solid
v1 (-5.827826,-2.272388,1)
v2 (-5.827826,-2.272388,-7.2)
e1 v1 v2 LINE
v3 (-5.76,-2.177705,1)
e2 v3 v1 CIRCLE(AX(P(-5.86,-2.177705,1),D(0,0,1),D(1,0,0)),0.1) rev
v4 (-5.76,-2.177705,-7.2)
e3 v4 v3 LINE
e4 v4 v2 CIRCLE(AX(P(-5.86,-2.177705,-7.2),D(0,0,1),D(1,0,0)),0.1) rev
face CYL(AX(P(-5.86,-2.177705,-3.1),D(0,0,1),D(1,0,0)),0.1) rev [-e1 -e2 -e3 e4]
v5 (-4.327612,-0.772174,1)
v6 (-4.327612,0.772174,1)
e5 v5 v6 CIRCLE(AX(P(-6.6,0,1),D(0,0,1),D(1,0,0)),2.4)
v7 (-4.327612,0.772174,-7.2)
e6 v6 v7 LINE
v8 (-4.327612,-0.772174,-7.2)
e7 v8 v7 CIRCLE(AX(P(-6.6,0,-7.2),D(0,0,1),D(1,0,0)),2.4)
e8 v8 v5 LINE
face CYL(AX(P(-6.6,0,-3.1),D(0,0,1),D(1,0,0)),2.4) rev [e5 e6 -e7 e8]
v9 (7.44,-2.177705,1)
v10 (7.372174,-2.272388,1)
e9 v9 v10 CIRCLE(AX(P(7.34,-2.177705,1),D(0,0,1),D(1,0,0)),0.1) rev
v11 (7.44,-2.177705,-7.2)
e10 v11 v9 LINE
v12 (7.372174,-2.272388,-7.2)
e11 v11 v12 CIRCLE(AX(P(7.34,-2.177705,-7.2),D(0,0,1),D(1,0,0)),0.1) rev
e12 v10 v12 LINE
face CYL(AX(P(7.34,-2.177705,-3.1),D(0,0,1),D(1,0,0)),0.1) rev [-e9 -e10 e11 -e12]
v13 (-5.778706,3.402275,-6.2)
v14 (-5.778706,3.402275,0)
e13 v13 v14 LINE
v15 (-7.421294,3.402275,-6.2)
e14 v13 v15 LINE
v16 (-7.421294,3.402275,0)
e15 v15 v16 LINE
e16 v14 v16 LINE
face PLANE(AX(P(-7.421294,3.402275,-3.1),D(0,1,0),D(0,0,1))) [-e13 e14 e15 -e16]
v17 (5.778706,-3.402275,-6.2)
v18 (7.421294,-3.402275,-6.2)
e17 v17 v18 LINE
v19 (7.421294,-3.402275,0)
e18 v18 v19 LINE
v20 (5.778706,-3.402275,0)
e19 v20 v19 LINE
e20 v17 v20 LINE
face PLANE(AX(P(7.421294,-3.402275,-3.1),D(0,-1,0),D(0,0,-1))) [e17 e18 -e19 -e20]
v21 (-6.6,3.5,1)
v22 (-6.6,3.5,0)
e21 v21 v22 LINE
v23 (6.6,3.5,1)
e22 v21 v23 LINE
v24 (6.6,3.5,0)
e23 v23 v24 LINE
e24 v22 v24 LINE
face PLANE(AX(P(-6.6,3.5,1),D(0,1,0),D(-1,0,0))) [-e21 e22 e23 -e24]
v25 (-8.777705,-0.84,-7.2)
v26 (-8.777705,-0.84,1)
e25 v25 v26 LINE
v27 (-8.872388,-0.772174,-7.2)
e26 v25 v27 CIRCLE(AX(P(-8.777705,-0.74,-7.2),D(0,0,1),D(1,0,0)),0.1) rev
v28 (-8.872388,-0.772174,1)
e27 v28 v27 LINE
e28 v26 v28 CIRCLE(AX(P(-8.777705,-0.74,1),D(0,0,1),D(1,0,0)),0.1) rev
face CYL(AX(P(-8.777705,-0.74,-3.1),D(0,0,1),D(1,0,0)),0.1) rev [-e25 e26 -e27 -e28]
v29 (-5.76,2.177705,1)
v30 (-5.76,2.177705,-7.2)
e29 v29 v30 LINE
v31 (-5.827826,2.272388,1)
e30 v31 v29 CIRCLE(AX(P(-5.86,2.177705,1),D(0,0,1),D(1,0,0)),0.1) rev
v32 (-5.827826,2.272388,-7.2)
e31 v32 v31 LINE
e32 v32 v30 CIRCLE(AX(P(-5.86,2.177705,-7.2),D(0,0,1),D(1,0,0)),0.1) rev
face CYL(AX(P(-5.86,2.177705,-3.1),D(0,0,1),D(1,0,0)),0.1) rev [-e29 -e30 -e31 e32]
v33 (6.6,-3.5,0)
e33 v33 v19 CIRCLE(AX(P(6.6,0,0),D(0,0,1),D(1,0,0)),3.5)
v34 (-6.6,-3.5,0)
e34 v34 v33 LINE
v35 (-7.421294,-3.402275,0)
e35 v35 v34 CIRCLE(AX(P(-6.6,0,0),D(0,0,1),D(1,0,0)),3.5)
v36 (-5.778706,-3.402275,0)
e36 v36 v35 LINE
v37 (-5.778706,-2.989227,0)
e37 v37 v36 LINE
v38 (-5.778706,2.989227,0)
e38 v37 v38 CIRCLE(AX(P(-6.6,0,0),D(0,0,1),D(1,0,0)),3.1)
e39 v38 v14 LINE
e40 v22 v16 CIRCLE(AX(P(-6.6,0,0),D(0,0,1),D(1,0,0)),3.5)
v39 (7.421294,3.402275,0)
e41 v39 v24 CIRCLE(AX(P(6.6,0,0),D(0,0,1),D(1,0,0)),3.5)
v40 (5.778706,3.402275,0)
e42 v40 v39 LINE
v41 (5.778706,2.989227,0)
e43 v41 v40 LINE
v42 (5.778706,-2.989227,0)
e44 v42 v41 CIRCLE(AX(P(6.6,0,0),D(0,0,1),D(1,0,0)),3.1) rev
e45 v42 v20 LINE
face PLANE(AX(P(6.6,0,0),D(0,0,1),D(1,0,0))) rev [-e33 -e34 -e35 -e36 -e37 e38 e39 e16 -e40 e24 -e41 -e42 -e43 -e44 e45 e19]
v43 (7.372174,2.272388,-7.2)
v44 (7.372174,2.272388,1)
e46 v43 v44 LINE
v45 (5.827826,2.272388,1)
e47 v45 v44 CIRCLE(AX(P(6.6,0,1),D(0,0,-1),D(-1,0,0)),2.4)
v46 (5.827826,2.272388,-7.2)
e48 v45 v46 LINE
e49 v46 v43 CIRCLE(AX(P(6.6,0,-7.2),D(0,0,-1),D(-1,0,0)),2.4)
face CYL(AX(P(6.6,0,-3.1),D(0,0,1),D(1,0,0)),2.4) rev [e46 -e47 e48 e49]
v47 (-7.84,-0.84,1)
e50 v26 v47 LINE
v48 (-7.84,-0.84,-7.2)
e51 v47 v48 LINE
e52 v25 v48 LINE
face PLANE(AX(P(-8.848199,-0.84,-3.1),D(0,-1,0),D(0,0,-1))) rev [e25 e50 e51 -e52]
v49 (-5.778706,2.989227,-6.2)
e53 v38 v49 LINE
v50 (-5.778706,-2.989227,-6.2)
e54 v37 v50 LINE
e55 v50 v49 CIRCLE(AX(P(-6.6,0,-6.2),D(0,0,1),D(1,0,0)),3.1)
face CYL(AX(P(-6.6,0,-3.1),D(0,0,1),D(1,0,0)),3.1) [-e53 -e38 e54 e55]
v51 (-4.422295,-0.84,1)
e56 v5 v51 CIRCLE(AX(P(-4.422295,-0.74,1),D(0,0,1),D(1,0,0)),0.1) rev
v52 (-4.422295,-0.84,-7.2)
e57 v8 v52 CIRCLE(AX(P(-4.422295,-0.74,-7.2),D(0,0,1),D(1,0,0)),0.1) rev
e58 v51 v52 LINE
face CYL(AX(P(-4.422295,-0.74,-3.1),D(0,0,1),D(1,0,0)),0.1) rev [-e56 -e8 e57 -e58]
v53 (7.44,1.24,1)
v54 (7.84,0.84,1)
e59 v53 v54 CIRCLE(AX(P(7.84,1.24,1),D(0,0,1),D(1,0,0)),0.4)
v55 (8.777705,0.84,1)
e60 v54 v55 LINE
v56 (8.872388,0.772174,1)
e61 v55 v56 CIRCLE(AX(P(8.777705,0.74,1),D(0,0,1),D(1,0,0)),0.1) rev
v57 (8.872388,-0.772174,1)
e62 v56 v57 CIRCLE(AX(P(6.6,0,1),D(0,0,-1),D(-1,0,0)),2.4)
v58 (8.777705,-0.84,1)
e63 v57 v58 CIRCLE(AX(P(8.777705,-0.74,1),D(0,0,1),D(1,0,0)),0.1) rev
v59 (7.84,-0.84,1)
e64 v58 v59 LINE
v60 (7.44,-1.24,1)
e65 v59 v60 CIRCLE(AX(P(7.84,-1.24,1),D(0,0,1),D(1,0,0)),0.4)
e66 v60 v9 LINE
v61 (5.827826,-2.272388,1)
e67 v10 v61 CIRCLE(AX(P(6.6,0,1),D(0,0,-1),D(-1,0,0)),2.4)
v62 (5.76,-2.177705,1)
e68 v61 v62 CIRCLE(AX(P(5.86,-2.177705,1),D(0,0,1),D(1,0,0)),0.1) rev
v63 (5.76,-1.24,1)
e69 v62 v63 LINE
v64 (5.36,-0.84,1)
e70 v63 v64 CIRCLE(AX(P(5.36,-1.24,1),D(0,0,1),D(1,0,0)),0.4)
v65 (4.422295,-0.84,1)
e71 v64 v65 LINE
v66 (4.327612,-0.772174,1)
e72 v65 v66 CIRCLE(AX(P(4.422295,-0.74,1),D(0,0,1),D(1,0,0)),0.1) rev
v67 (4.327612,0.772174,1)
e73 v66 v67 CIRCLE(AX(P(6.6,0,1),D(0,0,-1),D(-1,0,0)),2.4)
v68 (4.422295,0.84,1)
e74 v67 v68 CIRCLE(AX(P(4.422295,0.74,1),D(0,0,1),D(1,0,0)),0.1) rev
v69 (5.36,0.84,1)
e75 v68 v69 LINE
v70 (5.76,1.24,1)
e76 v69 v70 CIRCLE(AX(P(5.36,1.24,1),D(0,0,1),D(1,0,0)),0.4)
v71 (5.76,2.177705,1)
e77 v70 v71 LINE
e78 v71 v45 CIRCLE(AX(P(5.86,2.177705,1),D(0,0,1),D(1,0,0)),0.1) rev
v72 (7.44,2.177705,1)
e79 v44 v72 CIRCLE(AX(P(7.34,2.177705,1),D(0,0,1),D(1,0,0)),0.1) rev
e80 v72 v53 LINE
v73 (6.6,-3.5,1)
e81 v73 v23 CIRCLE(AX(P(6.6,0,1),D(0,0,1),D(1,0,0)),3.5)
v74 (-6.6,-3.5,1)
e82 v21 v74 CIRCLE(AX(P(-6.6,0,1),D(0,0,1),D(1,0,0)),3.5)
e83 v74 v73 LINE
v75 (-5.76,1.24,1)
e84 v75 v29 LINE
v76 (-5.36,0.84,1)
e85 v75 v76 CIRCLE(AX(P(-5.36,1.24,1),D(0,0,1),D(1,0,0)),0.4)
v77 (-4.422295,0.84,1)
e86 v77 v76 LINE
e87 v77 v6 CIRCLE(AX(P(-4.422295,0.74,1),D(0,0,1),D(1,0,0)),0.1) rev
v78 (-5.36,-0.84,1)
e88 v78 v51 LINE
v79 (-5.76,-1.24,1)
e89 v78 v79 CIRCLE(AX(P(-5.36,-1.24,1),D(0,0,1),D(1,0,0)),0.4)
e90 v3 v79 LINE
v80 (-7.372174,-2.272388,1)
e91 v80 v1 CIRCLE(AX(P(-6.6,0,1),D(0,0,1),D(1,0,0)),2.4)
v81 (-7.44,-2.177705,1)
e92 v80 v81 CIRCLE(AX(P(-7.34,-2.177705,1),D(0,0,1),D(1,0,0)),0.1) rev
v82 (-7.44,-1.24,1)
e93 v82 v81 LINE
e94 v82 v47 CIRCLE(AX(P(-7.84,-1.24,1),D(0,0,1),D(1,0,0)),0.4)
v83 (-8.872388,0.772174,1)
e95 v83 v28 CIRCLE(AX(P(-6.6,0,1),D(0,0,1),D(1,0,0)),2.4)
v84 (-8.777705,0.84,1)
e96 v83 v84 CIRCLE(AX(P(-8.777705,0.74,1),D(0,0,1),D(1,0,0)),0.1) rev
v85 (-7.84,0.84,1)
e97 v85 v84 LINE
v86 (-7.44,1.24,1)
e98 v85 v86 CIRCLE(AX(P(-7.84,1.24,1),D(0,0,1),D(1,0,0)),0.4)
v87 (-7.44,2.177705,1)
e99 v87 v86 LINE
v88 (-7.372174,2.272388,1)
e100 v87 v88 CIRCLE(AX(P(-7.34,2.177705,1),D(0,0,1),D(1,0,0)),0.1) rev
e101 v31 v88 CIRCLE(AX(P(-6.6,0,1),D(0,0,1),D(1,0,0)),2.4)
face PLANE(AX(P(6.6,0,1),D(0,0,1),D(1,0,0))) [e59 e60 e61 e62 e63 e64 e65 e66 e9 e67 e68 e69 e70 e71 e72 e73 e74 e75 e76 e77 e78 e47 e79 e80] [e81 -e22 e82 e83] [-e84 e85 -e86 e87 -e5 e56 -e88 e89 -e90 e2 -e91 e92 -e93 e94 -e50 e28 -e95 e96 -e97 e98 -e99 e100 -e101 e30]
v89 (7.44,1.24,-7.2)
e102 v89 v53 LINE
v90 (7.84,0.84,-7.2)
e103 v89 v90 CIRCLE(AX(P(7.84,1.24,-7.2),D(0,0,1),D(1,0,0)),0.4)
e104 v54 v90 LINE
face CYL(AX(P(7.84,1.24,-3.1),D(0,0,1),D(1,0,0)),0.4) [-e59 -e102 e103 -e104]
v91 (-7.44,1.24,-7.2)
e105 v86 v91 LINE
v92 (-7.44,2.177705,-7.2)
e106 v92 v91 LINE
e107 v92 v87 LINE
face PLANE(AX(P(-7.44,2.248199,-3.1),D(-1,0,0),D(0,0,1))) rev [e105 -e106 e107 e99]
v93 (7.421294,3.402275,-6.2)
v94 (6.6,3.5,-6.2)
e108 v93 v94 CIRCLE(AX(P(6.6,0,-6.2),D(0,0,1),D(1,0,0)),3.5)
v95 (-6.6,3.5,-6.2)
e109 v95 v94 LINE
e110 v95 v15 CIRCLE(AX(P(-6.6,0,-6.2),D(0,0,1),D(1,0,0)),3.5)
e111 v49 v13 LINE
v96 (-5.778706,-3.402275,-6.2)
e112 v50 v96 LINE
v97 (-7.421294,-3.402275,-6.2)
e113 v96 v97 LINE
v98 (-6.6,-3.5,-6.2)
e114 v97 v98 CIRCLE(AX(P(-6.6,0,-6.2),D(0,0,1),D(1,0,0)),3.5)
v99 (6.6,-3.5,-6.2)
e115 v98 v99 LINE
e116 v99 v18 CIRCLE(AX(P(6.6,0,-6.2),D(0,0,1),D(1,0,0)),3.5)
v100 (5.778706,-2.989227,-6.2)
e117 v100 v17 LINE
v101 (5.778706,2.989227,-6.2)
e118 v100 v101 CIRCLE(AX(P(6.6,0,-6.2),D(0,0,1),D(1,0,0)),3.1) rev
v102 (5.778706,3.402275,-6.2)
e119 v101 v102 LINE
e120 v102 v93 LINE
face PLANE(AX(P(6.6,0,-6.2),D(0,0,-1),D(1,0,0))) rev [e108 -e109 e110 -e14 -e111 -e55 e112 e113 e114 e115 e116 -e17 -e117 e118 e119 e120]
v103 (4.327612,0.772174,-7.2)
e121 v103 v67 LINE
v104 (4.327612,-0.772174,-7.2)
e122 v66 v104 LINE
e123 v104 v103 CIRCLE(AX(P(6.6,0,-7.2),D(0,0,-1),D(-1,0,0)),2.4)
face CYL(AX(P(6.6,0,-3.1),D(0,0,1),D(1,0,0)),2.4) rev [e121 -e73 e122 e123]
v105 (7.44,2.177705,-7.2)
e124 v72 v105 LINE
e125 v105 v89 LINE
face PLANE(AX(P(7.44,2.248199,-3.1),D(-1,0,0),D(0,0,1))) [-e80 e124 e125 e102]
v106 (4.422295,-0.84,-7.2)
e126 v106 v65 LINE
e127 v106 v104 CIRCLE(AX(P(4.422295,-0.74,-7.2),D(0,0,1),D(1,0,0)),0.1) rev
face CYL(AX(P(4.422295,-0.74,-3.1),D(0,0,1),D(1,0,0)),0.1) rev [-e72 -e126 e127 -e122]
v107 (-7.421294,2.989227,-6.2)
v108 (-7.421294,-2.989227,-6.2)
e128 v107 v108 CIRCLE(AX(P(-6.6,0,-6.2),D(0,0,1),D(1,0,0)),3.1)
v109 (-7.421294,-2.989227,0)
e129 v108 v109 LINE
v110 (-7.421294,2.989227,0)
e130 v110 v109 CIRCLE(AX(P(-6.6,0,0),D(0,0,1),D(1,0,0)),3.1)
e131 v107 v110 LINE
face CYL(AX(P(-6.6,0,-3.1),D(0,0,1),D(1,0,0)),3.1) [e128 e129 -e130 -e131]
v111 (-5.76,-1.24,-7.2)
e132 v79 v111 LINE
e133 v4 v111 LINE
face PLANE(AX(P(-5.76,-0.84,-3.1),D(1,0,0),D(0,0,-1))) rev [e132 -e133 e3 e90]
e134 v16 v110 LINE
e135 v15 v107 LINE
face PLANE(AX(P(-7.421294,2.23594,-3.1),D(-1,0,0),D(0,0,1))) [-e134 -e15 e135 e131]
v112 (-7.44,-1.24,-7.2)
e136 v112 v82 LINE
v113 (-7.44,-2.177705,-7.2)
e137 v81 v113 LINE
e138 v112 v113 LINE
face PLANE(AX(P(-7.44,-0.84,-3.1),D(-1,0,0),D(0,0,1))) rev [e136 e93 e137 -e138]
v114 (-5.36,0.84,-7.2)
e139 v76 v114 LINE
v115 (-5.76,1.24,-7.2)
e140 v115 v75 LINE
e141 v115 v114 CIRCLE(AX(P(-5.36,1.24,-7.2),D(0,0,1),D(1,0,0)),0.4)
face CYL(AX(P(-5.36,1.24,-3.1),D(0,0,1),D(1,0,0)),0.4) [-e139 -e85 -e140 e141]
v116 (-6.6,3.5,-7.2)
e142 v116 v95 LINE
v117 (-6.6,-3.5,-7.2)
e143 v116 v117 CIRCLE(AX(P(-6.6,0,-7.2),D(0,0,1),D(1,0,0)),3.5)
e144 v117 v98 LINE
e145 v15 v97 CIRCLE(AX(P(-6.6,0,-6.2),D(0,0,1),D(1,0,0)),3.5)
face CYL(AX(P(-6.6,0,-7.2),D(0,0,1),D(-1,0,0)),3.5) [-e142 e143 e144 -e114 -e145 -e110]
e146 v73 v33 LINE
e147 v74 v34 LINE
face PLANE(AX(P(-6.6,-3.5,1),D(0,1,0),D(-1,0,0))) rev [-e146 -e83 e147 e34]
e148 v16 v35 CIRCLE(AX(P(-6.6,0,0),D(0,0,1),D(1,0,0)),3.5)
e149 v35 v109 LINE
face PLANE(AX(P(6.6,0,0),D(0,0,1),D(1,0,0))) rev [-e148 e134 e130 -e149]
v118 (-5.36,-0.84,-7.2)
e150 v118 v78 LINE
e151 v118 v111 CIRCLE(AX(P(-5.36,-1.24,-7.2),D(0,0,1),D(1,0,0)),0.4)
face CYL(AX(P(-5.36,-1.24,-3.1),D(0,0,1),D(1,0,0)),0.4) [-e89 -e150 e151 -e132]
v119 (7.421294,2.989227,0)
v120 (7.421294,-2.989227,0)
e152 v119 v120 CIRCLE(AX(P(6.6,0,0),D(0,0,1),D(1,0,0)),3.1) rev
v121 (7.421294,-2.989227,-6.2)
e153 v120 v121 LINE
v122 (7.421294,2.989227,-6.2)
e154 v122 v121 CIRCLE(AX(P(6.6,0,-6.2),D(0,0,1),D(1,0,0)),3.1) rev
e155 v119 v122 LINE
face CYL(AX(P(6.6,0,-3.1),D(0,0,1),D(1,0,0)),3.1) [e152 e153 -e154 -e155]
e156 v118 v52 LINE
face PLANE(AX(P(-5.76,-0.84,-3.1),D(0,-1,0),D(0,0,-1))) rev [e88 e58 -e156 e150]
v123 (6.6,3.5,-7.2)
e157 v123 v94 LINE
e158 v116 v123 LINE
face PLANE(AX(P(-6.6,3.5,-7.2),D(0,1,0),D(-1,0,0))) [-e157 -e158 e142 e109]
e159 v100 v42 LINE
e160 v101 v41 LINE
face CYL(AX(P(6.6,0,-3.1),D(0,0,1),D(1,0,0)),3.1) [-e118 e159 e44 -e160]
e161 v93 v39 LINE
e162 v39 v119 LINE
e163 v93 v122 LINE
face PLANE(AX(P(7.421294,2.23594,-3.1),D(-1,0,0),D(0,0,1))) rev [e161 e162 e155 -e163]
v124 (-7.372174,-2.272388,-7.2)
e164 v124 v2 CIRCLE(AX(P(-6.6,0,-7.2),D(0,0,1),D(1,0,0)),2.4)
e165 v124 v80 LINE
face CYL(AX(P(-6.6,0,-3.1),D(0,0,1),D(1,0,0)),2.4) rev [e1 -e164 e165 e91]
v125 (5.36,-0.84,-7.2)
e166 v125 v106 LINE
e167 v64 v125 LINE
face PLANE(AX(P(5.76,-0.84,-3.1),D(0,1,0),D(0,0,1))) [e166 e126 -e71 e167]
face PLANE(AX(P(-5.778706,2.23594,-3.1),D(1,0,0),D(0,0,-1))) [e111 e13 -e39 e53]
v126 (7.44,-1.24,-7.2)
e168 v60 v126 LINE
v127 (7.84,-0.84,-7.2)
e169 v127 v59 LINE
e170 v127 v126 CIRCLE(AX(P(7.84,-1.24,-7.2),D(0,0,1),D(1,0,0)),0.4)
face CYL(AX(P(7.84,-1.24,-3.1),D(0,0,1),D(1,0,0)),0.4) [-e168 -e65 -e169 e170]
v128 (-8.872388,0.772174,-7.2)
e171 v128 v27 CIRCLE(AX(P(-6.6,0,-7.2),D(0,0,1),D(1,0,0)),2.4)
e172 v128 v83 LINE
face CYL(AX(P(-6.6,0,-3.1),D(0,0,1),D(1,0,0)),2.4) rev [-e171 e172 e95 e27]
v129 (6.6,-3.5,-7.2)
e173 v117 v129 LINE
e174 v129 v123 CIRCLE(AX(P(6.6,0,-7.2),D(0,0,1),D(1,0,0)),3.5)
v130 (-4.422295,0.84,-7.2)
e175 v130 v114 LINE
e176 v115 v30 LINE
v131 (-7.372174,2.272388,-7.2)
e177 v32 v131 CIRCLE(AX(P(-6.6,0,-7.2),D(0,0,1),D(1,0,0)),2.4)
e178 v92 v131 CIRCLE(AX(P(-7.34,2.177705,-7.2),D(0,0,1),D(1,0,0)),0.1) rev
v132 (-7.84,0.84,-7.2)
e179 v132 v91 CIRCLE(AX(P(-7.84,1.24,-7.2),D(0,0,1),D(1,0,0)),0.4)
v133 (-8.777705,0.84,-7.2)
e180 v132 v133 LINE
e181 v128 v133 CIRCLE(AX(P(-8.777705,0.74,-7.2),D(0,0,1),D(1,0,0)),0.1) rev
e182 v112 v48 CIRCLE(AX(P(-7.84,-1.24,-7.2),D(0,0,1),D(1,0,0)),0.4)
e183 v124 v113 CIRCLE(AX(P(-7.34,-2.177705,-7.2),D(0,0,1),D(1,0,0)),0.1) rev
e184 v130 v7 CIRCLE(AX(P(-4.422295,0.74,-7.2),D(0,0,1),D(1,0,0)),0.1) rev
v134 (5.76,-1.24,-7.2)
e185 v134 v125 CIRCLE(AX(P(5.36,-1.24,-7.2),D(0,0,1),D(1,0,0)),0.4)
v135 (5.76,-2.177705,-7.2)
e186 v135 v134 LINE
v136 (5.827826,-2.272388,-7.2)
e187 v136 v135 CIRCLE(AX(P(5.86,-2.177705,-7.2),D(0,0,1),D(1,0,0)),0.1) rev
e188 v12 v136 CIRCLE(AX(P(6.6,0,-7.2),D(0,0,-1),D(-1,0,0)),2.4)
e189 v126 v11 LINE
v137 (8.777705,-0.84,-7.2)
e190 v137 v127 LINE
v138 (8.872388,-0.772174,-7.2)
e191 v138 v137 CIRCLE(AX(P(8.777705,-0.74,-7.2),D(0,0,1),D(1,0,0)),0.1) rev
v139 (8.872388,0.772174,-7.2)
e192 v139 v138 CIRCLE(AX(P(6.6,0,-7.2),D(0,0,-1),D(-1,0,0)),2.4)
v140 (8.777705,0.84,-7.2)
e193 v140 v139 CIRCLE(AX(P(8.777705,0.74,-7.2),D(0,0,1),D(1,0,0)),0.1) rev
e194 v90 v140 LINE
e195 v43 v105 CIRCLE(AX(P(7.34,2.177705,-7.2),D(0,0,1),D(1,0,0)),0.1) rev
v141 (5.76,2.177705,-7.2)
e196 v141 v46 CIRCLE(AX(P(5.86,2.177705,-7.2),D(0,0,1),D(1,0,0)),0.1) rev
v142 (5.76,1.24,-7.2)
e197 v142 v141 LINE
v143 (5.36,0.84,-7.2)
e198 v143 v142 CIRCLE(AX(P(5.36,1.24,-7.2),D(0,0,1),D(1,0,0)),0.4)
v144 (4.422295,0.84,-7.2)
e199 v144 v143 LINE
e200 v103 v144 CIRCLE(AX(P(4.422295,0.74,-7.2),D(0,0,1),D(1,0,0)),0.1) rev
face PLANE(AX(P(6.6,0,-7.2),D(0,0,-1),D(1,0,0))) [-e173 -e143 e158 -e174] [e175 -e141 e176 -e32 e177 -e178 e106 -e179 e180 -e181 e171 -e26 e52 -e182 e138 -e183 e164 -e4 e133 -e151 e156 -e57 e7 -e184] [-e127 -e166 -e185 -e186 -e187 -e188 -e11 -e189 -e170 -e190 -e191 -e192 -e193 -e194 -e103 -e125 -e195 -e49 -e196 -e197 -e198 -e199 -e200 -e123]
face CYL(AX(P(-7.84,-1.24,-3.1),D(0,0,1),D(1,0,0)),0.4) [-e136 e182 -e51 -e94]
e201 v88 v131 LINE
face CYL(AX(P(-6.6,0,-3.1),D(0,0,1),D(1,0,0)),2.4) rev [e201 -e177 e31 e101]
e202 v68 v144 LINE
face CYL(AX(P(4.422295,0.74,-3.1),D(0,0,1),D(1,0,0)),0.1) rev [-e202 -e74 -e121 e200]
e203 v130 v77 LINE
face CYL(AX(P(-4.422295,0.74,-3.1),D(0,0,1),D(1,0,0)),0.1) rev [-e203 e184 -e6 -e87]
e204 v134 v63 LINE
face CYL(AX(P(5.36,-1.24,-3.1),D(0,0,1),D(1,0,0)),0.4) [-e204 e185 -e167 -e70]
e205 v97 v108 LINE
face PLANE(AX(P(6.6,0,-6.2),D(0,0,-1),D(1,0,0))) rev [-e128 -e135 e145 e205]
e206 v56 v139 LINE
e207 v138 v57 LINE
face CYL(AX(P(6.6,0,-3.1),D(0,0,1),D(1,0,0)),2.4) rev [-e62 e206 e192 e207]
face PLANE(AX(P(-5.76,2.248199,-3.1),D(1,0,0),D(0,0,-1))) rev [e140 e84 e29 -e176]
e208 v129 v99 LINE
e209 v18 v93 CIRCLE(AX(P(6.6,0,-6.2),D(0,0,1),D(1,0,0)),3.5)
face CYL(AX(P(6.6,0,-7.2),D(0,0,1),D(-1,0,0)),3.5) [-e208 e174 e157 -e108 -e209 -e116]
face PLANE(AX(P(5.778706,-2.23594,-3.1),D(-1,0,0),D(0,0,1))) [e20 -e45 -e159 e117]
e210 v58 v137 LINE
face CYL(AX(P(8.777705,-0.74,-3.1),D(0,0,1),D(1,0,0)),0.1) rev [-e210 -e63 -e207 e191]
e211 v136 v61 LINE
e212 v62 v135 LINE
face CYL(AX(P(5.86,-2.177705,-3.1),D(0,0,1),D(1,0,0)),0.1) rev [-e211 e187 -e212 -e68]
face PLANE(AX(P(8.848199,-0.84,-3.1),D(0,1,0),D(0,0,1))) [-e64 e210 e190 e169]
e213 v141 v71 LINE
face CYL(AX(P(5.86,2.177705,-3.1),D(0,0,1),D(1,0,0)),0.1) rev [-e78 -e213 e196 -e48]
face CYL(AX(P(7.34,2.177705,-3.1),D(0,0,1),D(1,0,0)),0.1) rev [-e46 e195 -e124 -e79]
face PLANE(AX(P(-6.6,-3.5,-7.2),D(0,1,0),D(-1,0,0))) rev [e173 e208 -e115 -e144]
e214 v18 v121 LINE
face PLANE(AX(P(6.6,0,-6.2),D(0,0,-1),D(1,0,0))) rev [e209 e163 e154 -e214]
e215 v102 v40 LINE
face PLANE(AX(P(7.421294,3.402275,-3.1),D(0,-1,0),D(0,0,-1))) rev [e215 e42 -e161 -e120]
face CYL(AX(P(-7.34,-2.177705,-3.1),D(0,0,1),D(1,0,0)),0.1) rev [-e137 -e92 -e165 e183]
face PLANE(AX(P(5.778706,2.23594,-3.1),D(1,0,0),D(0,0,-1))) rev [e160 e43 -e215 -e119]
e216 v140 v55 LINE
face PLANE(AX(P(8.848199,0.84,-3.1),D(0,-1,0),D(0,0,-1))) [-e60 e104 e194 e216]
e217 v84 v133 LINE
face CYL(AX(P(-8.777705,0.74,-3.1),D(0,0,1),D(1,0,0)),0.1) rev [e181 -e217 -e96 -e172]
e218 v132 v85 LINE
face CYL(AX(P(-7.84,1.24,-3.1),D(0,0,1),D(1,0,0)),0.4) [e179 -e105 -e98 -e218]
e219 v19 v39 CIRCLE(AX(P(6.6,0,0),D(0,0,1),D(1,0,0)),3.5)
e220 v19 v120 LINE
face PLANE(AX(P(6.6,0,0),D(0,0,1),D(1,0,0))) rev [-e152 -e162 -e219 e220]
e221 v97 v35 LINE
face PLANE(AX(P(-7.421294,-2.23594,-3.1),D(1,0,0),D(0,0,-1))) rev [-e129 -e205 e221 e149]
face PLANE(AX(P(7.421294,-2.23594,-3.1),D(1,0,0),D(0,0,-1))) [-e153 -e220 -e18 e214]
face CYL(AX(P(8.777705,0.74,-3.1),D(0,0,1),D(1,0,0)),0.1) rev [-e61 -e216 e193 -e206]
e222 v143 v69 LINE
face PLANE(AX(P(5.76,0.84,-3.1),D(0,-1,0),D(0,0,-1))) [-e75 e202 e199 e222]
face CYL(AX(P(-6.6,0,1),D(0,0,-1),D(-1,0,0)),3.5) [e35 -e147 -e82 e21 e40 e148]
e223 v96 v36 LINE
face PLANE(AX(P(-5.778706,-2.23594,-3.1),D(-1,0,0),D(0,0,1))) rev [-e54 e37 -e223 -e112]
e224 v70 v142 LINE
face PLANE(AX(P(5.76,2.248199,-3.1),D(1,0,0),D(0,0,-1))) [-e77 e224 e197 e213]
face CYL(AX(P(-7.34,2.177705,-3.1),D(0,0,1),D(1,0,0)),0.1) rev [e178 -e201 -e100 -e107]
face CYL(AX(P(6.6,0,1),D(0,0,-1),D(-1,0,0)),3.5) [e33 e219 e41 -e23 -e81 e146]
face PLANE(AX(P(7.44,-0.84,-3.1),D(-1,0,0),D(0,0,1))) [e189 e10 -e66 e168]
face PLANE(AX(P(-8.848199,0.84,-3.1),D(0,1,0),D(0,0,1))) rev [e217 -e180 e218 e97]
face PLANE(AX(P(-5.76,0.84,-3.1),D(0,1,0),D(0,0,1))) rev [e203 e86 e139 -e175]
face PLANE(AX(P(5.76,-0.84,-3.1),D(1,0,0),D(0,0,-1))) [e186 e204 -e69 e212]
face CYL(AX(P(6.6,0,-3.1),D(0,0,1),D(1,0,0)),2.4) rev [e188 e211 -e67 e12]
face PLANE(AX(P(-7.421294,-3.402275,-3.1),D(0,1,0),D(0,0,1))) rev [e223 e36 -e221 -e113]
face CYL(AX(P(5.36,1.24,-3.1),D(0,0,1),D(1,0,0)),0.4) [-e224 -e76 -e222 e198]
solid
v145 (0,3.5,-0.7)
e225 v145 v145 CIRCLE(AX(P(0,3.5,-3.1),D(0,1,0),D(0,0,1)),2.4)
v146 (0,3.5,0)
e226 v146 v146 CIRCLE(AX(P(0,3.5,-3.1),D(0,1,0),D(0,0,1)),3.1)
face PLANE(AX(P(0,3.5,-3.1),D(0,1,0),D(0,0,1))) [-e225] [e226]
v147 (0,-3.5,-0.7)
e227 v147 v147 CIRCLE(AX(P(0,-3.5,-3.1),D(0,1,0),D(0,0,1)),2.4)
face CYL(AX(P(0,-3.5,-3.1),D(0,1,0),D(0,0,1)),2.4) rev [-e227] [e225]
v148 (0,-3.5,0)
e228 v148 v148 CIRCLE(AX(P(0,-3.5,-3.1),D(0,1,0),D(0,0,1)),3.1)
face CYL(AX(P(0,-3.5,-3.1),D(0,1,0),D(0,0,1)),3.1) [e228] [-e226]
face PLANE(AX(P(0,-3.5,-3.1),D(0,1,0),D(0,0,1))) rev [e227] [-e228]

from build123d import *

# Parameters (mm, degrees)
BOSS_EXTRUDE1_DEPTH      = 10
BOSS_EXTRUDE2_DEPTH      = 35
BOSS_EXTRUDE2_DEPTH_BACK = 35
SKETCH2_R                = 31
SKETCH3_R                = 31
BOSS_EXTRUDE3_DEPTH      = 41
CUT_EXTRUDE1_DEPTH       = 41
FILLET1_R                = 4
FILLET2_R                = 4
FILLET3_R                = 4
FILLET4_R                = 4
FILLET5_R                = 1
FILLET6_R                = 1
FILLET7_R                = 1
FILLET8_R                = 1
FILLET9_R                = 1
FILLET10_R               = 1
FILLET11_R               = 1
FILLET12_R               = 1
BOSS_EXTRUDE4_DEPTH      = 41
MIRROR2_DEPTH            = 10
MIRROR2_START            = -31
MIRROR2_2_DEPTH          = 31
SKETCH6_R                = 24
CUT_EXTRUDE2_DEPTH       = 138.640836963
MIRROR3_START            = -72
MIRROR3_DEPTH            = 41
MIRROR3_2_DEPTH          = 10
SCALE1_SCALE             = 0.1


# Read off the part's stored shape, not the designer's step: Mirror2, Mirror3
with BuildPart() as part:
    # Sketch1 → Boss-Extrude1 (new body)
    with BuildSketch(Plane.XY):
        with BuildLine():
            Line((-66, 35), (66, 35))
            ThreePointArc((66, 35), (101, 0), (66, -35))
            Line((66, -35), (-66, -35))
            ThreePointArc((-66, -35), (-101, 0), (-66, 35))
        make_face()
    extrude(amount=BOSS_EXTRUDE1_DEPTH)

    # Sketch3 → Boss-Extrude3 (add)
    with BuildSketch(Plane.XY.offset(10)):
        with Locations((-66, 0)):
            Circle(SKETCH3_R)
    extrude(amount=-BOSS_EXTRUDE3_DEPTH)

    # Sketch4 → Cut-Extrude1 (cut)
    with BuildSketch(Plane.XY.offset(10)):
        with BuildLine():
            Line((-57.6, -8.4), (-43.518007206, -8.4))
            ThreePointArc((-43.518007206, -8.4), (-42, 0), (-43.518007206, 8.4))
            Line((-43.518007206, 8.4), (-57.6, 8.4))
            Line((-57.6, 8.4), (-57.6, 22.481992794))
            ThreePointArc((-57.6, 22.481992794), (-66, 24), (-74.4, 22.481992794))
            Line((-74.4, 22.481992794), (-74.4, 8.4))
            Line((-74.4, 8.4), (-88.481992794, 8.4))
            ThreePointArc((-88.481992794, 8.4), (-90, 0), (-88.481992794, -8.4))
            Line((-88.481992794, -8.4), (-74.4, -8.4))
            Line((-74.4, -8.4), (-74.4, -22.481992794))
            ThreePointArc((-74.4, -22.481992794), (-66, -24), (-57.6, -22.481992794))
            Line((-57.6, -22.481992794), (-57.6, -8.4))
        make_face()
    extrude(amount=-CUT_EXTRUDE1_DEPTH, mode=Mode.SUBTRACT)

    # Fillet1
    fillet1_edges = [part.edges().sort_by_distance(p)[0] for p in [
        (-57.6, 8.4, -10.5),
    ]]
    fillet(fillet1_edges, radius=FILLET1_R)

    # Fillet2
    fillet2_edges = [part.edges().sort_by_distance(p)[0] for p in [
        (-57.6, -8.4, -10.5),
    ]]
    fillet(fillet2_edges, radius=FILLET2_R)

    # Fillet3
    fillet3_edges = [part.edges().sort_by_distance(p)[0] for p in [
        (-74.4, -8.4, -10.5),
    ]]
    fillet(fillet3_edges, radius=FILLET3_R)

    # Fillet4
    fillet4_edges = [part.edges().sort_by_distance(p)[0] for p in [
        (-74.4, 8.4, -10.5),
    ]]
    fillet(fillet4_edges, radius=FILLET4_R)

    # Fillet5
    fillet5_edges = [part.edges().sort_by_distance(p)[0] for p in [
        (-74.4, -22.481992794, -10.5),
    ]]
    fillet(fillet5_edges, radius=FILLET5_R)

    # Fillet6
    fillet6_edges = [part.edges().sort_by_distance(p)[0] for p in [
        (-57.6, -22.481992794, -10.5),
    ]]
    fillet(fillet6_edges, radius=FILLET6_R)

    # Fillet7
    fillet7_edges = [part.edges().sort_by_distance(p)[0] for p in [
        (-43.518007206, -8.4, -10.5),
    ]]
    fillet(fillet7_edges, radius=FILLET7_R)

    # Fillet8
    fillet8_edges = [part.edges().sort_by_distance(p)[0] for p in [
        (-43.518007206, 8.4, -10.5),
    ]]
    fillet(fillet8_edges, radius=FILLET8_R)

    # Fillet9
    fillet9_edges = [part.edges().sort_by_distance(p)[0] for p in [
        (-88.481992794, -8.4, -10.5),
    ]]
    fillet(fillet9_edges, radius=FILLET9_R)

    # Fillet10
    fillet10_edges = [part.edges().sort_by_distance(p)[0] for p in [
        (-88.481992794, 8.4, -10.5),
    ]]
    fillet(fillet10_edges, radius=FILLET10_R)

    # Fillet11
    fillet11_edges = [part.edges().sort_by_distance(p)[0] for p in [
        (-74.4, 22.481992794, -10.5),
    ]]
    fillet(fillet11_edges, radius=FILLET11_R)

    # Fillet12
    fillet12_edges = [part.edges().sort_by_distance(p)[0] for p in [
        (-57.6, 22.481992794, -10.5),
    ]]
    fillet(fillet12_edges, radius=FILLET12_R)

    # Sketch5 → Boss-Extrude4 (add)
    with BuildSketch(Plane.XY.offset(10)):
        with BuildLine():
            Line((-74.212938845, 22.359401208), (-74.212938845, 34.022751734))
            Line((-74.212938845, 34.022751734), (-57.787061155, 34.022751734))
            Line((-57.787061155, 34.022751734), (-57.787061155, 22.359401208))
            ThreePointArc((-57.787061155, 22.359401208), (-58.004110065, 22.580118257), (-58.27826087, 22.723880496))
            ThreePointArc((-58.27826087, 22.723880496), (-66, 24), (-73.72173913, 22.723880496))
            ThreePointArc((-73.72173913, 22.723880496), (-73.995889935, 22.580118257), (-74.212938845, 22.359401208))
        make_face()
    boss_extrude4 = extrude(amount=-BOSS_EXTRUDE4_DEPTH)

    # Mirror1: Boss-Extrude4 across plane
    add(boss_extrude4.mirror(Plane.ZX))

    # Mirror2 outline → Mirror2 (cut)
    with BuildSketch(Plane.XY):
        with BuildLine():
            Line((44.222947858, -8.4), (53.6, -8.4))
            ThreePointArc((53.6, -8.4), (56.428427125, -9.571572875), (57.6, -12.4))
            Line((57.6, -12.4), (57.6, -21.777052142))
            ThreePointArc((57.6, -21.777052142), (57.787061155, -22.359401208), (58.27826087, -22.723880496))
            ThreePointArc((58.27826087, -22.723880496), (66, -24), (73.72173913, -22.723880496))
            ThreePointArc((73.72173913, -22.723880496), (74.212938845, -22.359401208), (74.4, -21.777052142))
            Line((74.4, -21.777052142), (74.4, -12.4))
            ThreePointArc((74.4, -12.4), (75.571572875, -9.571572875), (78.4, -8.4))
            Line((78.4, -8.4), (87.777052142, -8.4))
            ThreePointArc((87.777052142, -8.4), (88.359401208, -8.212938845), (88.723880496, -7.72173913))
            ThreePointArc((88.723880496, -7.72173913), (90, 0), (88.723880496, 7.72173913))
            ThreePointArc((88.723880496, 7.72173913), (88.359401208, 8.212938845), (87.777052142, 8.4))
            Line((87.777052142, 8.4), (78.4, 8.4))
            ThreePointArc((78.4, 8.4), (75.571572875, 9.571572875), (74.4, 12.4))
            Line((74.4, 12.4), (74.4, 21.777052142))
            ThreePointArc((74.4, 21.777052142), (74.212938845, 22.359401208), (73.72173913, 22.723880496))
            ThreePointArc((73.72173913, 22.723880496), (66, 24), (58.27826087, 22.723880496))
            ThreePointArc((58.27826087, 22.723880496), (57.787061155, 22.359401208), (57.6, 21.777052142))
            Line((57.6, 21.777052142), (57.6, 12.4))
            ThreePointArc((57.6, 12.4), (56.428427125, 9.571572875), (53.6, 8.4))
            Line((53.6, 8.4), (44.222947858, 8.4))
            ThreePointArc((44.222947858, 8.4), (43.640598792, 8.212938845), (43.276119504, 7.72173913))
            ThreePointArc((43.276119504, 7.72173913), (42, 0), (43.276119504, -7.72173913))
            ThreePointArc((43.276119504, -7.72173913), (43.640598792, -8.212938845), (44.222947858, -8.4))
        make_face()
    extrude(amount=MIRROR2_DEPTH, mode=Mode.SUBTRACT)

    # Mirror2 2 outline → Mirror2 2 (add)
    with BuildSketch(Plane.XY.offset(MIRROR2_START)):
        with BuildLine():
            Line((74.212938845, -34.022751734), (74.212938845, -29.892267153))
            ThreePointArc((74.212938845, -29.892267153), (97, 0), (74.212938845, 29.892267153))
            Line((74.212938845, 29.892267153), (74.212938845, 34.022751734))
            Line((74.212938845, 34.022751734), (57.787061155, 34.022751734))
            Line((57.787061155, 34.022751734), (57.787061155, 29.892267153))
            ThreePointArc((57.787061155, 29.892267153), (35, 0), (57.787061155, -29.892267153))
            Line((57.787061155, -29.892267153), (57.787061155, -34.022751734))
            Line((57.787061155, -34.022751734), (74.212938845, -34.022751734))
        make_face()
        with BuildLine():
            ThreePointArc((57.6, -12.4), (56.428427125, -9.571572875), (53.6, -8.4))
            Line((53.6, -8.4), (44.222947858, -8.4))
            ThreePointArc((44.222947858, -8.4), (43.640598792, -8.212938845), (43.276119504, -7.72173913))
            ThreePointArc((43.276119504, -7.72173913), (42, 0), (43.276119504, 7.72173913))
            ThreePointArc((43.276119504, 7.72173913), (43.640598792, 8.212938845), (44.222947858, 8.4))
            Line((44.222947858, 8.4), (53.6, 8.4))
            ThreePointArc((53.6, 8.4), (56.428427125, 9.571572875), (57.6, 12.4))
            Line((57.6, 12.4), (57.6, 21.777052142))
            ThreePointArc((57.6, 21.777052142), (57.787061155, 22.359401208), (58.27826087, 22.723880496))
            ThreePointArc((58.27826087, 22.723880496), (66, 24), (73.72173913, 22.723880496))
            ThreePointArc((73.72173913, 22.723880496), (74.212938845, 22.359401208), (74.4, 21.777052142))
            Line((74.4, 21.777052142), (74.4, 12.4))
            ThreePointArc((74.4, 12.4), (75.571572875, 9.571572875), (78.4, 8.4))
            Line((78.4, 8.4), (87.777052142, 8.4))
            ThreePointArc((87.777052142, 8.4), (88.359401208, 8.212938845), (88.723880496, 7.72173913))
            ThreePointArc((88.723880496, 7.72173913), (90, 0), (88.723880496, -7.72173913))
            ThreePointArc((88.723880496, -7.72173913), (88.359401208, -8.212938845), (87.777052142, -8.4))
            Line((87.777052142, -8.4), (78.4, -8.4))
            ThreePointArc((78.4, -8.4), (75.571572875, -9.571572875), (74.4, -12.4))
            Line((74.4, -12.4), (74.4, -21.777052142))
            ThreePointArc((74.4, -21.777052142), (74.212938845, -22.359401208), (73.72173913, -22.723880496))
            ThreePointArc((73.72173913, -22.723880496), (66, -24), (58.27826087, -22.723880496))
            ThreePointArc((58.27826087, -22.723880496), (57.787061155, -22.359401208), (57.6, -21.777052142))
            Line((57.6, -21.777052142), (57.6, -12.4))
        make_face(mode=Mode.SUBTRACT)
    extrude(amount=MIRROR2_2_DEPTH)

    # Mirror3 outline → Mirror3 (add)
    # profile 1 of 2: a face of its own
    with BuildSketch(Plane.XY.offset(MIRROR3_START)):
        with BuildLine():
            Line((74.212938845, -34.022751734), (74.212938845, -29.892267153))
            ThreePointArc((74.212938845, -29.892267153), (97, 0), (74.212938845, 29.892267153))
            Line((74.212938845, 29.892267153), (74.212938845, 34.022751734))
            Line((74.212938845, 34.022751734), (57.787061155, 34.022751734))
            Line((57.787061155, 34.022751734), (57.787061155, 29.892267153))
            ThreePointArc((57.787061155, 29.892267153), (35, 0), (57.787061155, -29.892267153))
            Line((57.787061155, -29.892267153), (57.787061155, -34.022751734))
            Line((57.787061155, -34.022751734), (74.212938845, -34.022751734))
        make_face()
        with BuildLine():
            ThreePointArc((57.6, -12.4), (56.428427125, -9.571572875), (53.6, -8.4))
            Line((53.6, -8.4), (44.222947858, -8.4))
            ThreePointArc((44.222947858, -8.4), (43.640598792, -8.212938845), (43.276119504, -7.72173913))
            ThreePointArc((43.276119504, -7.72173913), (42, 0), (43.276119504, 7.72173913))
            ThreePointArc((43.276119504, 7.72173913), (43.640598792, 8.212938845), (44.222947858, 8.4))
            Line((44.222947858, 8.4), (53.6, 8.4))
            ThreePointArc((53.6, 8.4), (56.428427125, 9.571572875), (57.6, 12.4))
            Line((57.6, 12.4), (57.6, 21.777052142))
            ThreePointArc((57.6, 21.777052142), (57.787061155, 22.359401208), (58.27826087, 22.723880496))
            ThreePointArc((58.27826087, 22.723880496), (66, 24), (73.72173913, 22.723880496))
            ThreePointArc((73.72173913, 22.723880496), (74.212938845, 22.359401208), (74.4, 21.777052142))
            Line((74.4, 21.777052142), (74.4, 12.4))
            ThreePointArc((74.4, 12.4), (75.571572875, 9.571572875), (78.4, 8.4))
            Line((78.4, 8.4), (87.777052142, 8.4))
            ThreePointArc((87.777052142, 8.4), (88.359401208, 8.212938845), (88.723880496, 7.72173913))
            ThreePointArc((88.723880496, 7.72173913), (90, 0), (88.723880496, -7.72173913))
            ThreePointArc((88.723880496, -7.72173913), (88.359401208, -8.212938845), (87.777052142, -8.4))
            Line((87.777052142, -8.4), (78.4, -8.4))
            ThreePointArc((78.4, -8.4), (75.571572875, -9.571572875), (74.4, -12.4))
            Line((74.4, -12.4), (74.4, -21.777052142))
            ThreePointArc((74.4, -21.777052142), (74.212938845, -22.359401208), (73.72173913, -22.723880496))
            ThreePointArc((73.72173913, -22.723880496), (66, -24), (58.27826087, -22.723880496))
            ThreePointArc((58.27826087, -22.723880496), (57.787061155, -22.359401208), (57.6, -21.777052142))
            Line((57.6, -21.777052142), (57.6, -12.4))
        make_face(mode=Mode.SUBTRACT)
    # profile 2 of 2: a face of its own
    with BuildSketch(Plane.XY.offset(MIRROR3_START)):
        with BuildLine():
            Line((-74.212938845, -29.892267153), (-74.212938845, -34.022751734))
            Line((-74.212938845, -34.022751734), (-57.787061155, -34.022751734))
            Line((-57.787061155, -34.022751734), (-57.787061155, -29.892267153))
            ThreePointArc((-57.787061155, -29.892267153), (-35, 0), (-57.787061155, 29.892267153))
            Line((-57.787061155, 29.892267153), (-57.787061155, 34.022751734))
            Line((-57.787061155, 34.022751734), (-74.212938845, 34.022751734))
            Line((-74.212938845, 34.022751734), (-74.212938845, 29.892267153))
            ThreePointArc((-74.212938845, 29.892267153), (-97, 0), (-74.212938845, -29.892267153))
        make_face()
        with BuildLine():
            ThreePointArc((-58.27826087, -22.723880496), (-66, -24), (-73.72173913, -22.723880496))
            ThreePointArc((-73.72173913, -22.723880496), (-74.212938845, -22.359401208), (-74.4, -21.777052142))
            Line((-74.4, -21.777052142), (-74.4, -12.4))
            ThreePointArc((-74.4, -12.4), (-75.571572875, -9.571572875), (-78.4, -8.4))
            Line((-78.4, -8.4), (-87.777052142, -8.4))
            ThreePointArc((-87.777052142, -8.4), (-88.359401208, -8.212938845), (-88.723880496, -7.72173913))
            ThreePointArc((-88.723880496, -7.72173913), (-90, 0), (-88.723880496, 7.72173913))
            ThreePointArc((-88.723880496, 7.72173913), (-88.359401208, 8.212938845), (-87.777052142, 8.4))
            Line((-87.777052142, 8.4), (-78.4, 8.4))
            ThreePointArc((-78.4, 8.4), (-75.571572875, 9.571572875), (-74.4, 12.4))
            Line((-74.4, 12.4), (-74.4, 21.777052142))
            ThreePointArc((-74.4, 21.777052142), (-74.212938845, 22.359401208), (-73.72173913, 22.723880496))
            ThreePointArc((-73.72173913, 22.723880496), (-66, 24), (-58.27826087, 22.723880496))
            ThreePointArc((-58.27826087, 22.723880496), (-57.787061155, 22.359401208), (-57.6, 21.777052142))
            Line((-57.6, 21.777052142), (-57.6, 12.4))
            ThreePointArc((-57.6, 12.4), (-56.428427125, 9.571572875), (-53.6, 8.4))
            Line((-53.6, 8.4), (-44.222947858, 8.4))
            ThreePointArc((-44.222947858, 8.4), (-43.640598792, 8.212938845), (-43.276119504, 7.72173913))
            ThreePointArc((-43.276119504, 7.72173913), (-42, 0), (-43.276119504, -7.72173913))
            ThreePointArc((-43.276119504, -7.72173913), (-43.640598792, -8.212938845), (-44.222947858, -8.4))
            Line((-44.222947858, -8.4), (-53.6, -8.4))
            ThreePointArc((-53.6, -8.4), (-56.428427125, -9.571572875), (-57.6, -12.4))
            Line((-57.6, -12.4), (-57.6, -21.777052142))
            ThreePointArc((-57.6, -21.777052142), (-57.787061155, -22.359401208), (-58.27826087, -22.723880496))
        make_face(mode=Mode.SUBTRACT)
    extrude(amount=MIRROR3_DEPTH)

    # Mirror3 2 outline → Mirror3 2 (add)
    with BuildSketch(Plane.XY.offset(MIRROR3_START)):
        with BuildLine():
            ThreePointArc((74.212938845, 29.892267153), (97, 0), (74.212938845, -29.892267153))
            Line((74.212938845, -29.892267153), (74.212938845, -34.022751734))
            ThreePointArc((74.212938845, -34.022751734), (101, 0), (74.212938845, 34.022751734))
            Line((74.212938845, 34.022751734), (74.212938845, 29.892267153))
        make_face()
        with BuildLine():
            ThreePointArc((66, -35), (70.135437663, -34.754829238), (74.212938845, -34.022751734))
            Line((74.212938845, -34.022751734), (57.787061155, -34.022751734))
            Line((57.787061155, -34.022751734), (57.787061155, -29.892267153))
            ThreePointArc((57.787061155, -29.892267153), (35, 0), (57.787061155, 29.892267153))
            Line((57.787061155, 29.892267153), (57.787061155, 34.022751734))
            Line((57.787061155, 34.022751734), (74.212938845, 34.022751734))
            ThreePointArc((74.212938845, 34.022751734), (70.135437663, 34.754829238), (66, 35))
            Line((66, 35), (-66, 35))
            ThreePointArc((-66, 35), (-70.135437663, 34.754829238), (-74.212938845, 34.022751734))
            Line((-74.212938845, 34.022751734), (-57.787061155, 34.022751734))
            Line((-57.787061155, 34.022751734), (-57.787061155, 29.892267153))
            ThreePointArc((-57.787061155, 29.892267153), (-35, 0), (-57.787061155, -29.892267153))
            Line((-57.787061155, -29.892267153), (-57.787061155, -34.022751734))
            Line((-57.787061155, -34.022751734), (-74.212938845, -34.022751734))
            ThreePointArc((-74.212938845, -34.022751734), (-70.135437663, -34.754829238), (-66, -35))
            Line((-66, -35), (66, -35))
        make_face()
        with BuildLine():
            ThreePointArc((-74.212938845, 34.022751734), (-101, 0), (-74.212938845, -34.022751734))
            Line((-74.212938845, -34.022751734), (-74.212938845, -29.892267153))
            ThreePointArc((-74.212938845, -29.892267153), (-97, 0), (-74.212938845, 29.892267153))
            Line((-74.212938845, 29.892267153), (-74.212938845, 34.022751734))
        make_face()
    extrude(amount=MIRROR3_2_DEPTH)


with BuildPart() as body_2:
    # Sketch2 → Boss-Extrude2 (new, two sides: drawn at the far end of the back side and taken through both)
    with BuildSketch(Plane(origin=(0, 0, 0), x_dir=(1, 0, 0), z_dir=(0, 1, 0)).offset(-BOSS_EXTRUDE2_DEPTH_BACK)):
        with Locations(Location((0, 31, 0), (0, 0, 270))):
            Circle(SKETCH2_R)
    extrude(amount=BOSS_EXTRUDE2_DEPTH + BOSS_EXTRUDE2_DEPTH_BACK)

    # Sketch6 → Cut-Extrude2 (cut, through all)
    with BuildSketch(Plane(origin=(0, 35, 0), x_dir=(1, 0, 0), z_dir=(0, 1, 0))):
        with Locations(Location((0, 31, 0), (0, 0, 270))):
            Circle(SKETCH6_R)
    extrude(amount=-CUT_EXTRUDE2_DEPTH, mode=Mode.SUBTRACT)


with BuildPart() as body_2_1:
    # Scale1: scaled about (0, 0, 0)
    add(body_2.part.scale(SCALE1_SCALE))


with BuildPart() as part_1:
    # Scale1: scaled about (0, 0, 0)
    add(part.part.scale(SCALE1_SCALE))


solid = Compound([body_2_1.part, part_1.part])
